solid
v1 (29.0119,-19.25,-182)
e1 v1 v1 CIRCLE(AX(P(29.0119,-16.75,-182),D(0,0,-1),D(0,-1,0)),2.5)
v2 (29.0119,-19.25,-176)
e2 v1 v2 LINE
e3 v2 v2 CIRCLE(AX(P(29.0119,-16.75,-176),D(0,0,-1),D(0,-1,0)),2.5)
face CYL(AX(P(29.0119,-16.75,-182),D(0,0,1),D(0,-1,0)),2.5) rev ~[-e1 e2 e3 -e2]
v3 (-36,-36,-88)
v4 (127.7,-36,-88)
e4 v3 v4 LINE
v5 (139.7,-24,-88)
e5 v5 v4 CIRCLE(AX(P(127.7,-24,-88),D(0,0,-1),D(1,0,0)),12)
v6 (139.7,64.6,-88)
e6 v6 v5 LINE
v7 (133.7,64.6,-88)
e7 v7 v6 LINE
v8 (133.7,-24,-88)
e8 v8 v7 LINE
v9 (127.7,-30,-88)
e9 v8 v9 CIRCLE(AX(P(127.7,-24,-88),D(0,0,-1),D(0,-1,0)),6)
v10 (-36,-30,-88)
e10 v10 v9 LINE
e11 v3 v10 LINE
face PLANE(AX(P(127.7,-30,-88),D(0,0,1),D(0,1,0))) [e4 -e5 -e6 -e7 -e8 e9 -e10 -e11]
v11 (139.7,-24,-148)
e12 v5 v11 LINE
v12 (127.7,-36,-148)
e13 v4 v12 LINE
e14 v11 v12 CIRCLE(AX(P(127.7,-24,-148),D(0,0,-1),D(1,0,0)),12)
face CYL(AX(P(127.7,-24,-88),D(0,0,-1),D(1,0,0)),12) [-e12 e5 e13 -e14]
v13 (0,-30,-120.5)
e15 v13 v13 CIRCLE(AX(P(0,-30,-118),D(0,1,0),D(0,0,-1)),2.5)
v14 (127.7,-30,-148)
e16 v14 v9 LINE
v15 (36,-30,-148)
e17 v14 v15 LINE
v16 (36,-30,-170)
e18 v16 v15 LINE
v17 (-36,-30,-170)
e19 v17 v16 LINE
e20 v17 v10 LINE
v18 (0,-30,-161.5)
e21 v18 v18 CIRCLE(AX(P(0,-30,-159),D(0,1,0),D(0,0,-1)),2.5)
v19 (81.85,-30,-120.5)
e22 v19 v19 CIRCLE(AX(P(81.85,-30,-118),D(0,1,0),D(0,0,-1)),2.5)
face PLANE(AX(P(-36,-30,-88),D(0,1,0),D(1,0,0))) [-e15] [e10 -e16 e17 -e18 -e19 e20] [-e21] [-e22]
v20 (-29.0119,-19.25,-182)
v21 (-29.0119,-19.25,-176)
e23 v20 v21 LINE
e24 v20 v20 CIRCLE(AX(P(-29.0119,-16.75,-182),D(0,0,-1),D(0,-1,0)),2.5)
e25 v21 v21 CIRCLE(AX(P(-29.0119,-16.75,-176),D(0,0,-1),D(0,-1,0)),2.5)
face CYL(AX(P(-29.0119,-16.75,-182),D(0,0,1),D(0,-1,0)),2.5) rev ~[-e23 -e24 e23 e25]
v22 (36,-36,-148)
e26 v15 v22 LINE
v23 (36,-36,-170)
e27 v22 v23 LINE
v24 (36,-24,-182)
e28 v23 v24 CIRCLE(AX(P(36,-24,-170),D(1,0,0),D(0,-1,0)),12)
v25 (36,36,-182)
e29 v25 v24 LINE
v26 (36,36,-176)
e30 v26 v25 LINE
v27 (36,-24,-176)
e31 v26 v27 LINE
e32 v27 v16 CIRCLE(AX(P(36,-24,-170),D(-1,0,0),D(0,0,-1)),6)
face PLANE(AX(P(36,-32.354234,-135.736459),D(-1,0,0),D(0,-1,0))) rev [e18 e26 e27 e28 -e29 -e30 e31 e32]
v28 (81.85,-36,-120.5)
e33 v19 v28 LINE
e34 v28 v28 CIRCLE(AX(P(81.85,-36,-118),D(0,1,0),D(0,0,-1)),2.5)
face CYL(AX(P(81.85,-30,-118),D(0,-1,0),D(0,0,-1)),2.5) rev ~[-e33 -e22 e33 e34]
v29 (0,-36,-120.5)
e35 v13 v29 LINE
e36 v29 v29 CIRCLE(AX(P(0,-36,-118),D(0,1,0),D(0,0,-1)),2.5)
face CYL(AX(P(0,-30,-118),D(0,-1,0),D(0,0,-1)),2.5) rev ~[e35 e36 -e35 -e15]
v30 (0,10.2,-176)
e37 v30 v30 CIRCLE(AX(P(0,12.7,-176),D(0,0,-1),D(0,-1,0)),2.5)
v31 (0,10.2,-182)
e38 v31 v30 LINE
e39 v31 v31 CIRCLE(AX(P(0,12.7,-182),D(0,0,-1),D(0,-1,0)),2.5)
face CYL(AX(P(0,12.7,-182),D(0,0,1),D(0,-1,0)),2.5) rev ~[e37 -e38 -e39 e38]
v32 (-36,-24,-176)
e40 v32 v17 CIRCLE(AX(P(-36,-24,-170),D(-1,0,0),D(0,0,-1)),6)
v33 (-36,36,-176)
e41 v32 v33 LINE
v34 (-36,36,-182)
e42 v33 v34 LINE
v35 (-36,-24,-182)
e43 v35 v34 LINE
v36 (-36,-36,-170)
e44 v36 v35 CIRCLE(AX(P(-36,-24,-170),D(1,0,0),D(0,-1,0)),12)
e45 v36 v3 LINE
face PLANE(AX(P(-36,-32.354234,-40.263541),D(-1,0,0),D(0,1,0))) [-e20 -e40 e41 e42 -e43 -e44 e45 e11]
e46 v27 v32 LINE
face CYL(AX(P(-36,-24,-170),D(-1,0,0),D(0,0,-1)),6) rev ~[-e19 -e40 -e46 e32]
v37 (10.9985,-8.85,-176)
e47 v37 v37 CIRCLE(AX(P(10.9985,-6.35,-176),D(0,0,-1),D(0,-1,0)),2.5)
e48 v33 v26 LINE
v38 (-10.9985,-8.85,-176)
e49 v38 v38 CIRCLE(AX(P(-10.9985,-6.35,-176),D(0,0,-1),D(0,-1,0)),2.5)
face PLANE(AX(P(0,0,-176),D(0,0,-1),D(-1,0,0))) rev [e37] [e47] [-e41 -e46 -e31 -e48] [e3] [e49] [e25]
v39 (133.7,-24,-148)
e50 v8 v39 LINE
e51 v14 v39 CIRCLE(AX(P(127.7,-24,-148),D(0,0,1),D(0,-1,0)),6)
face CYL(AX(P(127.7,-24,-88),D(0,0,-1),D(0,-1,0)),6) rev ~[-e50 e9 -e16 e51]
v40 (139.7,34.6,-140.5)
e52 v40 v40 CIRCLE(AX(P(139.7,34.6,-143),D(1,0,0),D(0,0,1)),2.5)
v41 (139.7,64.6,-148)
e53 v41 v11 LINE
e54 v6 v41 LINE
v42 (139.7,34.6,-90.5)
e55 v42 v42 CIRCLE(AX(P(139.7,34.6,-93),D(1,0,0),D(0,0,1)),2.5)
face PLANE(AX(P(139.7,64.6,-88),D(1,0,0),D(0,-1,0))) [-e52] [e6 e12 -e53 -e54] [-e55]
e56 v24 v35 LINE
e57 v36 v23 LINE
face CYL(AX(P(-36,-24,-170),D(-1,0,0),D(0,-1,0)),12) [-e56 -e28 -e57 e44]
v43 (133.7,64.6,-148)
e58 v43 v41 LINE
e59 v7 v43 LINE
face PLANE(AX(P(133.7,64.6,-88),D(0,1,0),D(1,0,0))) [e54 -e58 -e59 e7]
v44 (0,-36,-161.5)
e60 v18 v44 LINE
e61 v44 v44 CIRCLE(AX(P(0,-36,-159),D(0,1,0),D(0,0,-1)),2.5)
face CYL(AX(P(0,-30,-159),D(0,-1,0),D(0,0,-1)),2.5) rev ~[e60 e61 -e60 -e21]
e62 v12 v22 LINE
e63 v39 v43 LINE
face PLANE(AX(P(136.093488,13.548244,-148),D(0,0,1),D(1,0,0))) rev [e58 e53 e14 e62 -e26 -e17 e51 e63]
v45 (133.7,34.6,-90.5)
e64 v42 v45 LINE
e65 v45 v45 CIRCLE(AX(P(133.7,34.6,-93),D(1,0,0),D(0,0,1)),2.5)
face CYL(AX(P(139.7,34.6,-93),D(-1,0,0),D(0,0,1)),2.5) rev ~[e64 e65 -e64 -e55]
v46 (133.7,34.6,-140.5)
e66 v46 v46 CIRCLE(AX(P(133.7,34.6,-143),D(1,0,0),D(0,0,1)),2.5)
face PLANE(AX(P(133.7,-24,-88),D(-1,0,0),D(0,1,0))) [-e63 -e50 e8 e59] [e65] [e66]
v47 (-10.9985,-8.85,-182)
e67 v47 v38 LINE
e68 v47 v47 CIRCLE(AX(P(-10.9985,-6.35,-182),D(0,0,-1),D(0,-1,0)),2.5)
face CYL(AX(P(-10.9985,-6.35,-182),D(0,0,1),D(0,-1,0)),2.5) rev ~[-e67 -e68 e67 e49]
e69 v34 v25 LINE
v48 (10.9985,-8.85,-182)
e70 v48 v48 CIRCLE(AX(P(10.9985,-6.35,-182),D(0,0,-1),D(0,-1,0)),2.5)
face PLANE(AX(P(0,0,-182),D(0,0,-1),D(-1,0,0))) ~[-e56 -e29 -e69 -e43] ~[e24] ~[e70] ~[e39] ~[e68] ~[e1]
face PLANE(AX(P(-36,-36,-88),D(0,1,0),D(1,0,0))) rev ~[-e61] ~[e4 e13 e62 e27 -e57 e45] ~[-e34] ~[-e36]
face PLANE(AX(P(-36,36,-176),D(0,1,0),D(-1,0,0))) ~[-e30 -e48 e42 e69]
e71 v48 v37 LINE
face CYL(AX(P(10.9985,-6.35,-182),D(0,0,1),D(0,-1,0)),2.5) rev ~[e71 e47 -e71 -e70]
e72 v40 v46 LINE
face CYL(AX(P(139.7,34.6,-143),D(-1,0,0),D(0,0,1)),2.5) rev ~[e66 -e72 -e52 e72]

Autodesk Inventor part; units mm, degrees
ref_plane "YZ Plane" through (0, 0, 0) normal (1, 0, 0) x (0, 1, 0)
ref_plane "XZ Plane" through (0, 0, 0) normal (0, 1, 0) x (-1, 0, 0)
sketch "Sketch1" plane through (0, 0, 0) normal (0, 0, 1) x (1, 0, 0)
  line L0 (-36, 36) -> (36, 36)
  line L1 (36, 36) -> (36, -36)
  line L2 (36, -36) -> (-36, -36)
  line L3 (-36, -36) -> (-36, 36)
  point P0 (0, 0)
  dimension "d0" = 72
  dimension "d1" = 36
  dimension "d2" = 72
  dimension "d3" = 36
extrude "Plate1" add sketch "Sketch1" along normal blind 6
sketch "Sketch2" plane through (-36, -30, 6) normal (0, -1, 0) x (1, 0, 0)
  line L0 (72, 0) -> (0, 0)
  line L1 (0, 0) -> (0, -94)
  line L2 (0, -94) -> (72, -94)
  line L3 (72, -94) -> (72, 0)
edge flange "Flange1" height 94 angle 90 thickness 6 bend radius 6 thickness toward (0, -1, 0) relief tear relief width 6 relief depth 3 edges at (0, -36, 0) wall of the first edge with corners at (36, -30, 6) (-36, -30, 6) (-36, -30, -88) (36, -30, -88)
bend "Bend1"
corner "Corner1"
sketch "Sketch3" plane through (-36, -30, -88) normal (0, 1, 0) x (1, 0, 0)
  line L0 (72, -82) -> (72, 0)
  line L1 (72, 0) -> (175.7, 0)
  line L2 (175.7, 0) -> (175.7, -60)
  line L3 (175.7, -60) -> (72, -60)
  line L4 (72, -60) -> (72, 0)
  point P0 (36, -88)
  dimension "d15" = 103.7
  dimension "d16" = 60
sheet face with bend "Face2" sketch "Sketch3" thickness 6 toward (0, -1, 0) bend radius 6
bend "Bend2"
sketch "Sketch4" plane through (133.7, -36, -88) normal (1, 0, 0) x (0, 1, 0)
  line L0 (0, 60) -> (0, 0)
  line L1 (0, 0) -> (100.6, 0)
  line L2 (100.6, 0) -> (100.6, 60)
  line L3 (100.6, 60) -> (0, 60)
edge flange "Flange2" height 100.6 angle 90 thickness 6 bend radius 6 thickness toward (1, 0, 0) relief tear relief width 6 relief depth 3 edges at (139.7, -30, -58) wall of the first edge with corners at (133.7, -36, -28) (133.7, -36, -88) (133.7, 64.6, -88) (133.7, 64.6, -28)
bend "Bend3"
corner "Corner2"
sketch "Sketch5" plane through (139.7, 64.6, -28) normal (1, 0, 0) x (0, 0, -1)
  circle A0 centre (30, -30) radius 25
  line L0 (60, 0) -> (60, -88.6) projected
  line L1 (0, -88.6) -> (0, 0) projected
  line L2 (0, 0) -> (60, 0) projected
  point P0 (-28, -64.6)
  point P1 (55, -30)
  point P2 (5, -30)
  dimension "d32" = 60
  dimension "d33" = 30
  dimension "d34" = 30
  dimension "d35" = 50
  dimension "d36" = 30
  dimension "d37" = 30
hole "Hole1" at (139.7, 34.6, -33) at (139.7, 34.6, -83) direction (-1, 0, 0) diameter 5 end through all
sketch "Sketch6" plane through (0, 0, 6) normal (0, 0, 1) x (1, 0, 0)
  circle A0 centre (0, 0) radius 12.7
  line L0 (36, -36) -> (-36, -36) projected
  circle A1 centre (0, 0) radius 33.5
  line L1 (0, 0) -> (29.0119, -16.75)
  line L2 (0, 0) -> (-29.0119, -16.75)
  line L3 (0, 0) -> (0, 33.5)
  point P0 (0, 0)
  point P1 (0, 12.7)
  point P2 (10.9985, -6.35)
  point P3 (-10.9985, -6.35)
  dimension "d45" = 36
  dimension "d46" = 25.4
  dimension "d47" = 67
  dimension "d48" = 120
  dimension "d49" = 120
  dimension "d50" = 0
hole "Hole2" at (0, 12.7, 6) at (-10.9985, -6.35, 6) at (10.9985, -6.35, 6) at (29.0119, -16.75, 6) at (-29.0119, -16.75, 6) direction (0, 0, -1) diameter 5 end through all
sketch "Sketch7" plane through (-36, -30, -6) normal (0, 1, 0) x (1, 0, 0)
  line L0 (163.7, 82) -> (0, 82) projected
  line L1 (163.7, 22) -> (72, 22) projected
  line L2 (0, 0) -> (0, 82) projected
  line L3 (72, 0) -> (72, 22) projected
  point P0 (36, -6)
  point P1 (117.85, 52)
  point P2 (36, 52)
  point P3 (36, 11)
  dimension "d65" = 60
  dimension "d66" = 72
  dimension "d67" = 30
  dimension "d68" = 30
  dimension "d69" = 36
  dimension "d70" = 22
  dimension "d71" = 11
  dimension "d72" = 36
  dimension "d73" = 91.7
  dimension "d74" = 45.85
hole "Hole3" at (81.85, -30, -58) at (0, -30, -58) at (0, -30, -17) direction (0, -1, 0) diameter 5 end through all
mirror "Mirror1" about plane through (133.7, -24, -88) normal (0, 0, -1)
ref_plane "Work Plane1" through (127.7, -30, -88) normal (0, 0, -1) x (-1, 0, 0)
split "Split1" plane through (127.7, -30, -88) removes the side toward (0, 0, 1)
equation "\"d67\" = 0.5 * d65"
equation "\"d68\" = 0.5 * d65"
equation "\"d69\" = 0.5 * d66"
equation "\"d71\" = 0.5 * d70"
equation "\"d72\" = 0.5 * d66"
equation "\"d74\" = 0.5 * d73"
equation "\"d1\" = 0.5 * d0"
equation "\"d2\" = d0"
equation "\"d33\" = 0.5 * d32"
equation "\"d34\" = d33"
equation "\"d36\" = d34"
equation "\"d37\" = d36"
equation "\"d43\" = Thickness"
equation "\"d49\" = d48"
equation "\"d56\" = Thickness"
equation "\"d63\" = Thickness"
equation "\"d4\" = Thickness"
equation "\"d5\" = BendReliefWidth"
equation "\"d6\" = BendReliefDepth"
equation "\"d7\" = MinimumRemnant"
equation "\"d8\" = TransitionRadius"
equation "\"d11\" = BendRadius"
equation "\"d12\" = CornerReliefSize"
equation "\"d13\" = GapSize"
equation "\"d14\" = JacobiRadiusSize"
equation "\"d17\" = BendRadius"
equation "\"d18\" = BendReliefWidth"
equation "\"d20\" = MinimumRemnant"
equation "\"d19\" = BendReliefDepth"
equation "\"d21\" = TransitionRadius"
equation "\"d22\" = BendReliefWidth"
equation "\"d23\" = BendReliefDepth"
equation "\"d24\" = MinimumRemnant"
equation "\"d25\" = TransitionRadius"
equation "\"d28\" = BendRadius"
equation "\"d29\" = CornerReliefSize"
equation "\"d30\" = GapSize"
equation "\"d31\" = JacobiRadiusSize"
equation "\"d3\" = d1"
equation "\"BendRadius\" = Thickness"
equation "\"BendReliefWidth\" = Thickness"
equation "\"BendReliefDepth\" = 0.5 * Thickness"
equation "\"CornerReliefSize\" = 4 * Thickness"
equation "\"MinimumRemnant\" = 2 * Thickness"
equation "\"TransitionRadius\" = BendRadius"
equation "\"JacobiRadiusSize\" = BendRadius"
equation "\"GapSize\" = Thickness"
equation "\"Thickness\" = 6"
properties part number "motorHolder_flipped"
